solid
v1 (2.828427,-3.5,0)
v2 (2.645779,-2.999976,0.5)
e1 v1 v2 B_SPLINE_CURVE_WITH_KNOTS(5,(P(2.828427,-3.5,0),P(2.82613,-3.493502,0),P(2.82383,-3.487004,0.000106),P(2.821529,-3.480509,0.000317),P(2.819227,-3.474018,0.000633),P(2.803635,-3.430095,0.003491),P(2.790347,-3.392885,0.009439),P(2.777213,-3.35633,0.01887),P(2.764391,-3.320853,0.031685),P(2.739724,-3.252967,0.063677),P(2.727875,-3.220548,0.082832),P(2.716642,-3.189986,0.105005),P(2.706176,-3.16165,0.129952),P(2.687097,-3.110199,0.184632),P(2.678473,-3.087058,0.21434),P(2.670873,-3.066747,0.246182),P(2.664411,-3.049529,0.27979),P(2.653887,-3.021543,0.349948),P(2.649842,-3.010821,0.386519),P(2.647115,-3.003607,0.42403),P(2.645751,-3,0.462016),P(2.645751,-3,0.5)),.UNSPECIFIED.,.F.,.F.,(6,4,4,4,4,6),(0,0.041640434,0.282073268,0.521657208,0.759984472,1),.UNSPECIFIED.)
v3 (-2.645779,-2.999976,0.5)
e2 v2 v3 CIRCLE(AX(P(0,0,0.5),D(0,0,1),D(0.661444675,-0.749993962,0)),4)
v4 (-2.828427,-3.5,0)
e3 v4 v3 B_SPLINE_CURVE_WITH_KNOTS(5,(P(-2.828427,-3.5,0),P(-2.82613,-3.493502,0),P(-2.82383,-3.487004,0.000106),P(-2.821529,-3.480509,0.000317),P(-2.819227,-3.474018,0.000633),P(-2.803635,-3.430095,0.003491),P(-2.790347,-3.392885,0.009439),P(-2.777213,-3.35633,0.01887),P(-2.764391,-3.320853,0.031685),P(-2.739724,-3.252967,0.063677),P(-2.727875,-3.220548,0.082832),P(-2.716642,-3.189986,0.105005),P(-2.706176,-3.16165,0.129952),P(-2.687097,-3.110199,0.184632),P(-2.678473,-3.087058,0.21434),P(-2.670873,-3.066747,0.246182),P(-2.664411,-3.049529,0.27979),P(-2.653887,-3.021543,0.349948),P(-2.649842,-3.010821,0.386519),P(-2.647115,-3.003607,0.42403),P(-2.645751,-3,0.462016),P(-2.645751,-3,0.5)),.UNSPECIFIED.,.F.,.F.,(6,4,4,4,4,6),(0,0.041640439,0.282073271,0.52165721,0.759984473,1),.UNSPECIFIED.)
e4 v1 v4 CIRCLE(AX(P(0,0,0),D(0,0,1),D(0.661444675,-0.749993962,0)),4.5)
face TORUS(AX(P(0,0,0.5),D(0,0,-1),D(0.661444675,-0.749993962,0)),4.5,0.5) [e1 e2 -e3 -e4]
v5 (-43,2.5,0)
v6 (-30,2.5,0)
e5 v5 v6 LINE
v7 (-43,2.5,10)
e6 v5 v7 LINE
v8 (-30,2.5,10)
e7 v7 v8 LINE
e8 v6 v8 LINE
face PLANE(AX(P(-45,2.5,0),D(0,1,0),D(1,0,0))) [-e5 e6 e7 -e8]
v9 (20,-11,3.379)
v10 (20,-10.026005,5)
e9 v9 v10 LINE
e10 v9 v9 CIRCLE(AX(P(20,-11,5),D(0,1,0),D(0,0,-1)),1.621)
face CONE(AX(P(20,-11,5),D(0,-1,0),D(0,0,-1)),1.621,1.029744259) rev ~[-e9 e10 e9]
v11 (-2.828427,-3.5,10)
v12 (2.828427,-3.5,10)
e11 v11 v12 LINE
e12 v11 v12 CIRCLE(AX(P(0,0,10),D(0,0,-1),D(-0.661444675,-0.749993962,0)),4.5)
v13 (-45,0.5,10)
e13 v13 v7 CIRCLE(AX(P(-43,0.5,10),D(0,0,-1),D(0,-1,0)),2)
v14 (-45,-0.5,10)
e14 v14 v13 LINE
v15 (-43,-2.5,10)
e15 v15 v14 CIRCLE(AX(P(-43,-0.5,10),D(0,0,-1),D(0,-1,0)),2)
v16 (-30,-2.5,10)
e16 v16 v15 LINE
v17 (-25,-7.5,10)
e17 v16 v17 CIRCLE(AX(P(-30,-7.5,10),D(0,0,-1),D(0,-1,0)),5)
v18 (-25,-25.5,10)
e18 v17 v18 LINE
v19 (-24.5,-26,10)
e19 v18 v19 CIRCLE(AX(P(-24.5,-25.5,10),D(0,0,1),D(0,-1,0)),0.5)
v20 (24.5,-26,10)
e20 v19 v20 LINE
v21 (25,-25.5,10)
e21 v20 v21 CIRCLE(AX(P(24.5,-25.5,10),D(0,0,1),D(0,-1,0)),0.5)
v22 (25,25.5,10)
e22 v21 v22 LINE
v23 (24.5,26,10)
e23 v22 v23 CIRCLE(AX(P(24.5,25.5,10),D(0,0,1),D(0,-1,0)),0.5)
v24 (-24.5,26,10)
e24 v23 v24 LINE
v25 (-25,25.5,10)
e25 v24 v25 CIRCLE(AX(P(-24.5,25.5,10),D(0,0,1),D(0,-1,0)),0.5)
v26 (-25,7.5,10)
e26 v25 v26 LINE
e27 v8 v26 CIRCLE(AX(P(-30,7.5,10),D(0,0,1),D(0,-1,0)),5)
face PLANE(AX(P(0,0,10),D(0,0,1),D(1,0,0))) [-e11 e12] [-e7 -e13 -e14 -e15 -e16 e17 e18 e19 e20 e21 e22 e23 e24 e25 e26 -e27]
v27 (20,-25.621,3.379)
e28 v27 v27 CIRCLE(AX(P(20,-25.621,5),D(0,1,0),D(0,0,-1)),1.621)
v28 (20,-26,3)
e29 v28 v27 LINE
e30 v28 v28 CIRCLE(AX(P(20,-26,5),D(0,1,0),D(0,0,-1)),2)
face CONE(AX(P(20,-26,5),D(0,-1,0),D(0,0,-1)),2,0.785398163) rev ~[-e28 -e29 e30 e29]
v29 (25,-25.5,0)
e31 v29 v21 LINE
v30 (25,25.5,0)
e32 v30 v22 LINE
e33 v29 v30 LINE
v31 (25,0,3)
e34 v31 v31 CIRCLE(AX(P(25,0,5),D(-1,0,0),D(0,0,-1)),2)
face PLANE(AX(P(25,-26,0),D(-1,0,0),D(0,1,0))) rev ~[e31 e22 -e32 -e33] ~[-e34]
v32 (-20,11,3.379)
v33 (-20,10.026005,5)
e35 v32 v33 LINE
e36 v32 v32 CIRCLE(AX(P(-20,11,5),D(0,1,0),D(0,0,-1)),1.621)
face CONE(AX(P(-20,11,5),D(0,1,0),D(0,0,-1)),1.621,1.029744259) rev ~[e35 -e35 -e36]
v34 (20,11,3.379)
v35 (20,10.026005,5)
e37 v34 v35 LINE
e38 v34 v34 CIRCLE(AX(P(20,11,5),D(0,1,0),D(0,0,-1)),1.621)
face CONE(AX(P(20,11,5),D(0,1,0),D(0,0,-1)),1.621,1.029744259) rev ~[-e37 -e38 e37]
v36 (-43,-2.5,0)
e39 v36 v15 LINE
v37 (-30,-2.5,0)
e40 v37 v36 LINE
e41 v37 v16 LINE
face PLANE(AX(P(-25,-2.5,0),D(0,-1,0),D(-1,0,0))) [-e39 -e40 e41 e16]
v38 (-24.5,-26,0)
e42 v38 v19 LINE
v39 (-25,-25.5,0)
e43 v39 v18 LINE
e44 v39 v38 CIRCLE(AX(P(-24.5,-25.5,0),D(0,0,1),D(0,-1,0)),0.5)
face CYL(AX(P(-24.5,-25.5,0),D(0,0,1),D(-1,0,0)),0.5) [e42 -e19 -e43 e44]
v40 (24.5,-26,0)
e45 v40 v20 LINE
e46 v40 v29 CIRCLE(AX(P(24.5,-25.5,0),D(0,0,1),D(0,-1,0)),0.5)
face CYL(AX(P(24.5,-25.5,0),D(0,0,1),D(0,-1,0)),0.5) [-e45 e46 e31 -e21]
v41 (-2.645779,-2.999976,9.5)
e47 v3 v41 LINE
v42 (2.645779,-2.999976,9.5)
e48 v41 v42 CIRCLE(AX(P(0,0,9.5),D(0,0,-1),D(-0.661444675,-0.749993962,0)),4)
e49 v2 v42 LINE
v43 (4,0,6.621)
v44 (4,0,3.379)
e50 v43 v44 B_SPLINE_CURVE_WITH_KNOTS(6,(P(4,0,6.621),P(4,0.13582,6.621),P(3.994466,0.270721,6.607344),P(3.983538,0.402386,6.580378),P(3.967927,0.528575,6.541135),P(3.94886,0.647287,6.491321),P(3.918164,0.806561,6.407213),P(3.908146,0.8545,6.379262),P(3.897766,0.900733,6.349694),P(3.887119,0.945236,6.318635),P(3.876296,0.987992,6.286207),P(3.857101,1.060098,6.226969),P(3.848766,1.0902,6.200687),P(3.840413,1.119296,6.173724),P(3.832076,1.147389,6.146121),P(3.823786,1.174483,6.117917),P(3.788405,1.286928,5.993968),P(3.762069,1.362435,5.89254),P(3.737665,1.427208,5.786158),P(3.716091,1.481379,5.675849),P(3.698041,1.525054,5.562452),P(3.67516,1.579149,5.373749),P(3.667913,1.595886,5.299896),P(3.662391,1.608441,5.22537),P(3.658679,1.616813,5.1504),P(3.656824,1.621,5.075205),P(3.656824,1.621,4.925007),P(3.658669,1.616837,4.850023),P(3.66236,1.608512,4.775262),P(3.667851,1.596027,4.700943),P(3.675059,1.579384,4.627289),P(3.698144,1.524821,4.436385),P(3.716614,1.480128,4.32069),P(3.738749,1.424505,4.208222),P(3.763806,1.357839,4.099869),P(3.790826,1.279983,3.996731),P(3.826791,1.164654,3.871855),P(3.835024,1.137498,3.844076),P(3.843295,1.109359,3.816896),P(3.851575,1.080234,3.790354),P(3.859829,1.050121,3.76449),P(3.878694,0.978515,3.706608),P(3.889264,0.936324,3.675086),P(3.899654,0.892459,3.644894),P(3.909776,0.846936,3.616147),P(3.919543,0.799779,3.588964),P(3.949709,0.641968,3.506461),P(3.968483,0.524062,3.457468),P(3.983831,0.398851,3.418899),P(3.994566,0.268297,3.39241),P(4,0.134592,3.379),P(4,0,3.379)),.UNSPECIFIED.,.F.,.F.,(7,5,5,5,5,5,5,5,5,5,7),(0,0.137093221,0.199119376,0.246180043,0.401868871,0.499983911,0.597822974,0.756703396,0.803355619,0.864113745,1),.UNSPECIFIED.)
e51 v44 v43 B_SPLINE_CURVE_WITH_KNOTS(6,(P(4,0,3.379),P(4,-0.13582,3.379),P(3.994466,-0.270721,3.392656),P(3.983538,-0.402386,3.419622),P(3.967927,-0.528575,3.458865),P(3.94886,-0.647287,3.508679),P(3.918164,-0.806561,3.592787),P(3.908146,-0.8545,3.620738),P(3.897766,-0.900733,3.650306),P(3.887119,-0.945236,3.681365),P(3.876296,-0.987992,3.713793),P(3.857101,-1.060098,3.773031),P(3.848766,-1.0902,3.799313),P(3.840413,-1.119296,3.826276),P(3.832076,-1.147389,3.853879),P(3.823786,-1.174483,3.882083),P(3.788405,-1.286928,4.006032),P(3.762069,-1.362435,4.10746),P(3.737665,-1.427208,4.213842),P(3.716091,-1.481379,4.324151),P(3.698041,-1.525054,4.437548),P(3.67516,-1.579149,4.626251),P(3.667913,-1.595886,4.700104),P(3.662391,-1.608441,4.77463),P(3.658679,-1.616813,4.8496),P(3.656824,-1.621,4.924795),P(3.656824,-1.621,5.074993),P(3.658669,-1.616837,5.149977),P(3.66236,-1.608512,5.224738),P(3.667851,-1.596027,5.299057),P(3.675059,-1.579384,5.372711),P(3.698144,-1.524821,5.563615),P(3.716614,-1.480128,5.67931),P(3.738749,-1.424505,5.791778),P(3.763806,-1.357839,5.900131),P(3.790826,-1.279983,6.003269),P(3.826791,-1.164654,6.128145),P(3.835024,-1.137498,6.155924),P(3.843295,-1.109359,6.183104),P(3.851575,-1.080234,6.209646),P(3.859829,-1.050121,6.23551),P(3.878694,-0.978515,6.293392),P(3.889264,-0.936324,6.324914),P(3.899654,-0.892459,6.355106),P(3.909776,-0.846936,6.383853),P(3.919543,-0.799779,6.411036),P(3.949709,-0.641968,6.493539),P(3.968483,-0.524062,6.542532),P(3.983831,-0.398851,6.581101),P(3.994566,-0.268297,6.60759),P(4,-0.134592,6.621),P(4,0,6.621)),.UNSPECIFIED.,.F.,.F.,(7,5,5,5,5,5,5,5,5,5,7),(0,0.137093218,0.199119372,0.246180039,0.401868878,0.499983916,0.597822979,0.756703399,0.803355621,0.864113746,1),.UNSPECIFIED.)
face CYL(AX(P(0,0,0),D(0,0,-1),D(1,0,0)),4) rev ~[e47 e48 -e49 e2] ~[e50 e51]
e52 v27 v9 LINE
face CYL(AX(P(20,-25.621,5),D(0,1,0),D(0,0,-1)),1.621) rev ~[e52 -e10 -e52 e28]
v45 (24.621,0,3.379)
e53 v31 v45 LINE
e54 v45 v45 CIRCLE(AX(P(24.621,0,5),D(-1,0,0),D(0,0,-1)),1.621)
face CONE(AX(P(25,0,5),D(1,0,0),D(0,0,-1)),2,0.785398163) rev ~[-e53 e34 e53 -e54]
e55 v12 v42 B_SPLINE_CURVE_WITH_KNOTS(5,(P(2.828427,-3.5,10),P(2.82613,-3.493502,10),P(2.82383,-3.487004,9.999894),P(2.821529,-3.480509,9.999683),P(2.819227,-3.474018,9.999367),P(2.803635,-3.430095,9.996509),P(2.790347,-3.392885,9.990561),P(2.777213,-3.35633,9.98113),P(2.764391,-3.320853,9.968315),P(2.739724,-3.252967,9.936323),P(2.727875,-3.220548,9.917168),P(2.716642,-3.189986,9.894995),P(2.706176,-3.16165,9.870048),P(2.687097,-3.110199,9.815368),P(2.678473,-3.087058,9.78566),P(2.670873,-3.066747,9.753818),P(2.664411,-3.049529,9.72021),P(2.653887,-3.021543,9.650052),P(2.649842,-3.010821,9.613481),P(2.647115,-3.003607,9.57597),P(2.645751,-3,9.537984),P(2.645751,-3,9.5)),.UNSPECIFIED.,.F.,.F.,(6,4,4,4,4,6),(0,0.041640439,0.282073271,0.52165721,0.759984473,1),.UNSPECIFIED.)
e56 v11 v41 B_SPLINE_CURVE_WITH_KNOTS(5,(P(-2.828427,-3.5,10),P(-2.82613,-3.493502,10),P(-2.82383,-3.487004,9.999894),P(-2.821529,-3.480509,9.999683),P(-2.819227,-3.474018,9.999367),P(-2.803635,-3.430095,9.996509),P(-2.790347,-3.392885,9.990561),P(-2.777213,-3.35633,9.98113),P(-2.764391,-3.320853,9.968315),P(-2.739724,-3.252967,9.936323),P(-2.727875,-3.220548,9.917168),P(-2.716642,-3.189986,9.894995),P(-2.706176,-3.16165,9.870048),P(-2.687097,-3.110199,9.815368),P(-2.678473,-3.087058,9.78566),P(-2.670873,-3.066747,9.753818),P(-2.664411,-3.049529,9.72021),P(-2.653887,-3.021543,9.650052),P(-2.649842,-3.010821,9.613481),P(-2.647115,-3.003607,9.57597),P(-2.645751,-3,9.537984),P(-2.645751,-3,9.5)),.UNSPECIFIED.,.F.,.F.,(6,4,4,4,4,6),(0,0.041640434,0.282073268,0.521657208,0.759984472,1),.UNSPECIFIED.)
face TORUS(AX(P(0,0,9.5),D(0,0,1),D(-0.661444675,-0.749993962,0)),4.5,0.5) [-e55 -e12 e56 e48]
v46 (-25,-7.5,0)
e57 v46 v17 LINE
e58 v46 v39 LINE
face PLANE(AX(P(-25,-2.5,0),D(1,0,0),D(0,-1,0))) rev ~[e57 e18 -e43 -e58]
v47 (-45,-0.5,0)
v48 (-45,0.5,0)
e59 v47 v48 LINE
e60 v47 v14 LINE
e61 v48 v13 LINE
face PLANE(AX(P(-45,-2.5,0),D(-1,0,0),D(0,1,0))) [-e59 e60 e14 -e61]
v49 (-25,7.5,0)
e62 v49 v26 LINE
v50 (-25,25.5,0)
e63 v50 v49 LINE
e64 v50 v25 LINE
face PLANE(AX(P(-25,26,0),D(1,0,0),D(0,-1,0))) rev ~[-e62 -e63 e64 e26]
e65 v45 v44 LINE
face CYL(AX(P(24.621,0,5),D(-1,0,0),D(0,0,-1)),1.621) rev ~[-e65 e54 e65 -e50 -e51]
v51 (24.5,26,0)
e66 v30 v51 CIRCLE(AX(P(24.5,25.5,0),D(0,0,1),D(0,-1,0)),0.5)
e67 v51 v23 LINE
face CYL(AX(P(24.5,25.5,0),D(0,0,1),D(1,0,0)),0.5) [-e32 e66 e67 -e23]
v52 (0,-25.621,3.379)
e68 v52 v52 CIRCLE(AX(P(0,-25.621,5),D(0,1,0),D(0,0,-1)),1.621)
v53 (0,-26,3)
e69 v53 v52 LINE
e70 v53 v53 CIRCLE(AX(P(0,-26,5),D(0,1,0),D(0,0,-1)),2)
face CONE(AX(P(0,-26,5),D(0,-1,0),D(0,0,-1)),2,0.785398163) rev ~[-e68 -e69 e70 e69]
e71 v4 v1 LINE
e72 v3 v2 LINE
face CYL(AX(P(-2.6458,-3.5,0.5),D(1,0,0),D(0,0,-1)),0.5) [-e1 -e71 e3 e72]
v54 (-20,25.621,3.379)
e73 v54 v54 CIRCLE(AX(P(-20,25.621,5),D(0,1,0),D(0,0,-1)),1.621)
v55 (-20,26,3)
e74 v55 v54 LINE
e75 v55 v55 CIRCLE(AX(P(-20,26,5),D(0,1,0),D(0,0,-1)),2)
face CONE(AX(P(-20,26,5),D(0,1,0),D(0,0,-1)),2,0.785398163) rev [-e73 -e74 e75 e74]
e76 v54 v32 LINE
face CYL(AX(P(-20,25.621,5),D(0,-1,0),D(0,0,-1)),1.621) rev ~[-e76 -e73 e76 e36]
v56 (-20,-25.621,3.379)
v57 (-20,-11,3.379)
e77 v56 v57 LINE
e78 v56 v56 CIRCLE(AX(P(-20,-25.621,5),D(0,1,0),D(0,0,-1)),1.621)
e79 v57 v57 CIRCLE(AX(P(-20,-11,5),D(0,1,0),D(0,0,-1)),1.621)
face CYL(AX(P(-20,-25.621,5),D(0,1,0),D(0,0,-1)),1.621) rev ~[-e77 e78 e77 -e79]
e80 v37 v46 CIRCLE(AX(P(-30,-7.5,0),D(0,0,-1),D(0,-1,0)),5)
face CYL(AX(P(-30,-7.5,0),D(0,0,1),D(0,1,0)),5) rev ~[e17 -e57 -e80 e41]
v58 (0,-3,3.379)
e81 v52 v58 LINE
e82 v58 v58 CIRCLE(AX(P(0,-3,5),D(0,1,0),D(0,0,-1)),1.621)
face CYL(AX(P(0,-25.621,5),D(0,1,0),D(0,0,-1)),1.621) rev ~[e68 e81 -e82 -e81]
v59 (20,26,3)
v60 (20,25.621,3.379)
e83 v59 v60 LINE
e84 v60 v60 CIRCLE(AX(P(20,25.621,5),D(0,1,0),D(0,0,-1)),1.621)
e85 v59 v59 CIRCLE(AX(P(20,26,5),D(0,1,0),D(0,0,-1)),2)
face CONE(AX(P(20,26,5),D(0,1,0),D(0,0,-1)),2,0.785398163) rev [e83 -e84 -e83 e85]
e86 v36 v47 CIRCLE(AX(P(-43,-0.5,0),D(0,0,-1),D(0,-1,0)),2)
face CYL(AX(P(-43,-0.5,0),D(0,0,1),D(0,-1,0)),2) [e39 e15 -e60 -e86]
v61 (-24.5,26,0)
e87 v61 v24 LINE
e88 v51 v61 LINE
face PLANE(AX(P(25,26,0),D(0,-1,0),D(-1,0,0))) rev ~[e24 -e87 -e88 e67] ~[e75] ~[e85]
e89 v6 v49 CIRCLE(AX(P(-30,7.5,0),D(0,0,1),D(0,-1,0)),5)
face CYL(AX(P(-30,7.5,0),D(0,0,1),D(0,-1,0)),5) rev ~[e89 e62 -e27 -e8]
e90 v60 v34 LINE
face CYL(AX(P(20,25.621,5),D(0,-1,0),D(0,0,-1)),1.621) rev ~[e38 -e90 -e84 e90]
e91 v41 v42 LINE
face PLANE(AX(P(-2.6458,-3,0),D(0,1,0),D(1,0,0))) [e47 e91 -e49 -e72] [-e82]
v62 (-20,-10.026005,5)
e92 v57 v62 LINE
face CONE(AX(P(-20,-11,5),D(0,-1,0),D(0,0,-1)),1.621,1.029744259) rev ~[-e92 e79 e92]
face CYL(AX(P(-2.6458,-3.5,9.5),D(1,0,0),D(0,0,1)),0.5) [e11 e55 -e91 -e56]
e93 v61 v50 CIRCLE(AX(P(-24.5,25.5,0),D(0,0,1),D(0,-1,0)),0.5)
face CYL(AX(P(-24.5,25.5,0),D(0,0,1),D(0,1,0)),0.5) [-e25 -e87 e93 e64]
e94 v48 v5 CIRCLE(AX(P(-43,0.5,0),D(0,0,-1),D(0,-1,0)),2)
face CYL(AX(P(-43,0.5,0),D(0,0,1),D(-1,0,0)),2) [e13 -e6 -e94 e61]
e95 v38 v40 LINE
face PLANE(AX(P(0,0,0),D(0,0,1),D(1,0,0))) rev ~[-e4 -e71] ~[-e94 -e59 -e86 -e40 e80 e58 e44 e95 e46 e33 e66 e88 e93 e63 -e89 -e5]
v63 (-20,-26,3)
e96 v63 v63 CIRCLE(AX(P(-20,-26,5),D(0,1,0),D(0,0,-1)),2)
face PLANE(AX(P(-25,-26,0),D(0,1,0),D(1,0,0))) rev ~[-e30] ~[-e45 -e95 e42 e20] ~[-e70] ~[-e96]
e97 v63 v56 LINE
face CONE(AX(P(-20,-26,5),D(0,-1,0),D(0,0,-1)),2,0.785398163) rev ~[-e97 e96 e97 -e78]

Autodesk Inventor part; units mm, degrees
ref_plane "YZ Plane" through (0, 0, 0) normal (1, 0, 0) x (0, 1, 0)
ref_plane "XZ Plane" through (0, 0, 0) normal (0, 1, 0) x (-1, 0, 0)
ref_plane "XY Plane" through (0, 0, 0) normal (0, 0, 1) x (1, 0, 0)
sketch "Sketch1" plane through (0, 0, 0) normal (0, 0, 1) x (1, 0, 0)
  line L0 (-25, -26) -> (25, -26)
  line L1 (25, -26) -> (25, 26)
  line L2 (25, 26) -> (-25, 26)
  line L3 (-25, 26) -> (-25, -26)
  line L4 (-25, -26) -> (25, 26) construction
  line L5 (25, -26) -> (-25, 26) construction
  circle A0 centre (0, 0) radius 4
  line L6 (-2.6458, -3) -> (2.6458, -3)
  line L7 (-45, 2.5) -> (-5, 2.5)
  line L8 (-5, 2.5) -> (-5, -2.5)
  line L9 (-5, -2.5) -> (-45, -2.5)
  line L10 (-45, -2.5) -> (-45, 2.5)
  line L11 (-45, 2.5) -> (-5, -2.5) construction
  line L12 (-5, 2.5) -> (-45, -2.5) construction
  point P0 (-25, 0)
  point P1 (-25, -2.5)
  point P2 (-25, 2.5)
  dimension "d0" = 50
  dimension "d1" = 52
  dimension "d2" = 8
  dimension "d39" = 3
  dimension "d40" = 20
  dimension "d41" = 5
extrude "Extrusion1" add sketch "Sketch1" along normal blind 10 contours L3 L9 L8 L7 L2 L1 L0 | L9 L10 L7 L3 | L3 L7 L8 L9 | L6 A0 picked at (-0.6179, -3.1815)
sketch "Sketch2" plane through (-25, -26, 0) normal (0, -1, 0) x (1, 0, 0)
  line L0 (0, 0) -> (0, 10) projected
  line L1 (50, 0) -> (50, 10) projected
  line L2 (0, 0) -> (50, 0) projected
  point P0 (25, 0)
  point P1 (0, 5)
  point P2 (45, 5)
  point P3 (25, 5)
  point P4 (5, 5)
  point P5 (0, 5)
  point P6 (50, 5)
  point P7 (25, 0)
  dimension "d19" = 5
  dimension "d20" = 5
hole "Hole1" at (20, -26, 5) at (-20, -26, 5) direction (0, 1, 0) diameter 3.242 depth 15 tip angle 118 countersink diameter 4 countersink angle 90 thread size "M4x0.7" class "6H" standard "ANSI Metric M Profile"
fillet "Fillet2" radius 0.5 8 edges at (0, 4, 10) (-25, -26, 5) (25, -26, 5) (25, 26, 5) (-25, 26, 5) (0, 4, 0) (0, -3, 10) (0, -3, 0)
hole "Hole2" at (0, -26, 5) direction (0, 1, 0) diameter 3.242 end up to surface countersink diameter 4 countersink angle 90 thread size "M4x0.7" class "6H" standard "ANSI Metric M Profile"
mirror "Mirror1" about plane through (0, 0, 0) normal (0, 1, 0) of "Hole1"
sketch "Sketch3" plane through (25, -25.5, 0.5) normal (1, 0, 0) x (0, 0, -1)
  line L0 (-9.5, 51) -> (0.5, 51) projected
  point P0 (0.5, 25.5)
  point P1 (-4.5, 25.5)
  point P2 (-4.5, 51)
  point P3 (-9, 51)
  point P4 (0, 51)
hole "Hole3" at (25, 0, 5) direction (-1, 0, 0) diameter 3.242 end up to surface countersink diameter 4 countersink angle 90 thread size "M4x0.7" class "6H" standard "ANSI Metric M Profile"
fillet "Fillet3" radius 2 2 edges at (-45, 2.5, 5) (-45, -2.5, 5)
fillet "Fillet4" radius 5 2 edges at (-25, -2.5, 5) (-25, 2.5, 5)
properties part number "bevestegingsKoppeling axis4_5" material "Aluminum 6061"
